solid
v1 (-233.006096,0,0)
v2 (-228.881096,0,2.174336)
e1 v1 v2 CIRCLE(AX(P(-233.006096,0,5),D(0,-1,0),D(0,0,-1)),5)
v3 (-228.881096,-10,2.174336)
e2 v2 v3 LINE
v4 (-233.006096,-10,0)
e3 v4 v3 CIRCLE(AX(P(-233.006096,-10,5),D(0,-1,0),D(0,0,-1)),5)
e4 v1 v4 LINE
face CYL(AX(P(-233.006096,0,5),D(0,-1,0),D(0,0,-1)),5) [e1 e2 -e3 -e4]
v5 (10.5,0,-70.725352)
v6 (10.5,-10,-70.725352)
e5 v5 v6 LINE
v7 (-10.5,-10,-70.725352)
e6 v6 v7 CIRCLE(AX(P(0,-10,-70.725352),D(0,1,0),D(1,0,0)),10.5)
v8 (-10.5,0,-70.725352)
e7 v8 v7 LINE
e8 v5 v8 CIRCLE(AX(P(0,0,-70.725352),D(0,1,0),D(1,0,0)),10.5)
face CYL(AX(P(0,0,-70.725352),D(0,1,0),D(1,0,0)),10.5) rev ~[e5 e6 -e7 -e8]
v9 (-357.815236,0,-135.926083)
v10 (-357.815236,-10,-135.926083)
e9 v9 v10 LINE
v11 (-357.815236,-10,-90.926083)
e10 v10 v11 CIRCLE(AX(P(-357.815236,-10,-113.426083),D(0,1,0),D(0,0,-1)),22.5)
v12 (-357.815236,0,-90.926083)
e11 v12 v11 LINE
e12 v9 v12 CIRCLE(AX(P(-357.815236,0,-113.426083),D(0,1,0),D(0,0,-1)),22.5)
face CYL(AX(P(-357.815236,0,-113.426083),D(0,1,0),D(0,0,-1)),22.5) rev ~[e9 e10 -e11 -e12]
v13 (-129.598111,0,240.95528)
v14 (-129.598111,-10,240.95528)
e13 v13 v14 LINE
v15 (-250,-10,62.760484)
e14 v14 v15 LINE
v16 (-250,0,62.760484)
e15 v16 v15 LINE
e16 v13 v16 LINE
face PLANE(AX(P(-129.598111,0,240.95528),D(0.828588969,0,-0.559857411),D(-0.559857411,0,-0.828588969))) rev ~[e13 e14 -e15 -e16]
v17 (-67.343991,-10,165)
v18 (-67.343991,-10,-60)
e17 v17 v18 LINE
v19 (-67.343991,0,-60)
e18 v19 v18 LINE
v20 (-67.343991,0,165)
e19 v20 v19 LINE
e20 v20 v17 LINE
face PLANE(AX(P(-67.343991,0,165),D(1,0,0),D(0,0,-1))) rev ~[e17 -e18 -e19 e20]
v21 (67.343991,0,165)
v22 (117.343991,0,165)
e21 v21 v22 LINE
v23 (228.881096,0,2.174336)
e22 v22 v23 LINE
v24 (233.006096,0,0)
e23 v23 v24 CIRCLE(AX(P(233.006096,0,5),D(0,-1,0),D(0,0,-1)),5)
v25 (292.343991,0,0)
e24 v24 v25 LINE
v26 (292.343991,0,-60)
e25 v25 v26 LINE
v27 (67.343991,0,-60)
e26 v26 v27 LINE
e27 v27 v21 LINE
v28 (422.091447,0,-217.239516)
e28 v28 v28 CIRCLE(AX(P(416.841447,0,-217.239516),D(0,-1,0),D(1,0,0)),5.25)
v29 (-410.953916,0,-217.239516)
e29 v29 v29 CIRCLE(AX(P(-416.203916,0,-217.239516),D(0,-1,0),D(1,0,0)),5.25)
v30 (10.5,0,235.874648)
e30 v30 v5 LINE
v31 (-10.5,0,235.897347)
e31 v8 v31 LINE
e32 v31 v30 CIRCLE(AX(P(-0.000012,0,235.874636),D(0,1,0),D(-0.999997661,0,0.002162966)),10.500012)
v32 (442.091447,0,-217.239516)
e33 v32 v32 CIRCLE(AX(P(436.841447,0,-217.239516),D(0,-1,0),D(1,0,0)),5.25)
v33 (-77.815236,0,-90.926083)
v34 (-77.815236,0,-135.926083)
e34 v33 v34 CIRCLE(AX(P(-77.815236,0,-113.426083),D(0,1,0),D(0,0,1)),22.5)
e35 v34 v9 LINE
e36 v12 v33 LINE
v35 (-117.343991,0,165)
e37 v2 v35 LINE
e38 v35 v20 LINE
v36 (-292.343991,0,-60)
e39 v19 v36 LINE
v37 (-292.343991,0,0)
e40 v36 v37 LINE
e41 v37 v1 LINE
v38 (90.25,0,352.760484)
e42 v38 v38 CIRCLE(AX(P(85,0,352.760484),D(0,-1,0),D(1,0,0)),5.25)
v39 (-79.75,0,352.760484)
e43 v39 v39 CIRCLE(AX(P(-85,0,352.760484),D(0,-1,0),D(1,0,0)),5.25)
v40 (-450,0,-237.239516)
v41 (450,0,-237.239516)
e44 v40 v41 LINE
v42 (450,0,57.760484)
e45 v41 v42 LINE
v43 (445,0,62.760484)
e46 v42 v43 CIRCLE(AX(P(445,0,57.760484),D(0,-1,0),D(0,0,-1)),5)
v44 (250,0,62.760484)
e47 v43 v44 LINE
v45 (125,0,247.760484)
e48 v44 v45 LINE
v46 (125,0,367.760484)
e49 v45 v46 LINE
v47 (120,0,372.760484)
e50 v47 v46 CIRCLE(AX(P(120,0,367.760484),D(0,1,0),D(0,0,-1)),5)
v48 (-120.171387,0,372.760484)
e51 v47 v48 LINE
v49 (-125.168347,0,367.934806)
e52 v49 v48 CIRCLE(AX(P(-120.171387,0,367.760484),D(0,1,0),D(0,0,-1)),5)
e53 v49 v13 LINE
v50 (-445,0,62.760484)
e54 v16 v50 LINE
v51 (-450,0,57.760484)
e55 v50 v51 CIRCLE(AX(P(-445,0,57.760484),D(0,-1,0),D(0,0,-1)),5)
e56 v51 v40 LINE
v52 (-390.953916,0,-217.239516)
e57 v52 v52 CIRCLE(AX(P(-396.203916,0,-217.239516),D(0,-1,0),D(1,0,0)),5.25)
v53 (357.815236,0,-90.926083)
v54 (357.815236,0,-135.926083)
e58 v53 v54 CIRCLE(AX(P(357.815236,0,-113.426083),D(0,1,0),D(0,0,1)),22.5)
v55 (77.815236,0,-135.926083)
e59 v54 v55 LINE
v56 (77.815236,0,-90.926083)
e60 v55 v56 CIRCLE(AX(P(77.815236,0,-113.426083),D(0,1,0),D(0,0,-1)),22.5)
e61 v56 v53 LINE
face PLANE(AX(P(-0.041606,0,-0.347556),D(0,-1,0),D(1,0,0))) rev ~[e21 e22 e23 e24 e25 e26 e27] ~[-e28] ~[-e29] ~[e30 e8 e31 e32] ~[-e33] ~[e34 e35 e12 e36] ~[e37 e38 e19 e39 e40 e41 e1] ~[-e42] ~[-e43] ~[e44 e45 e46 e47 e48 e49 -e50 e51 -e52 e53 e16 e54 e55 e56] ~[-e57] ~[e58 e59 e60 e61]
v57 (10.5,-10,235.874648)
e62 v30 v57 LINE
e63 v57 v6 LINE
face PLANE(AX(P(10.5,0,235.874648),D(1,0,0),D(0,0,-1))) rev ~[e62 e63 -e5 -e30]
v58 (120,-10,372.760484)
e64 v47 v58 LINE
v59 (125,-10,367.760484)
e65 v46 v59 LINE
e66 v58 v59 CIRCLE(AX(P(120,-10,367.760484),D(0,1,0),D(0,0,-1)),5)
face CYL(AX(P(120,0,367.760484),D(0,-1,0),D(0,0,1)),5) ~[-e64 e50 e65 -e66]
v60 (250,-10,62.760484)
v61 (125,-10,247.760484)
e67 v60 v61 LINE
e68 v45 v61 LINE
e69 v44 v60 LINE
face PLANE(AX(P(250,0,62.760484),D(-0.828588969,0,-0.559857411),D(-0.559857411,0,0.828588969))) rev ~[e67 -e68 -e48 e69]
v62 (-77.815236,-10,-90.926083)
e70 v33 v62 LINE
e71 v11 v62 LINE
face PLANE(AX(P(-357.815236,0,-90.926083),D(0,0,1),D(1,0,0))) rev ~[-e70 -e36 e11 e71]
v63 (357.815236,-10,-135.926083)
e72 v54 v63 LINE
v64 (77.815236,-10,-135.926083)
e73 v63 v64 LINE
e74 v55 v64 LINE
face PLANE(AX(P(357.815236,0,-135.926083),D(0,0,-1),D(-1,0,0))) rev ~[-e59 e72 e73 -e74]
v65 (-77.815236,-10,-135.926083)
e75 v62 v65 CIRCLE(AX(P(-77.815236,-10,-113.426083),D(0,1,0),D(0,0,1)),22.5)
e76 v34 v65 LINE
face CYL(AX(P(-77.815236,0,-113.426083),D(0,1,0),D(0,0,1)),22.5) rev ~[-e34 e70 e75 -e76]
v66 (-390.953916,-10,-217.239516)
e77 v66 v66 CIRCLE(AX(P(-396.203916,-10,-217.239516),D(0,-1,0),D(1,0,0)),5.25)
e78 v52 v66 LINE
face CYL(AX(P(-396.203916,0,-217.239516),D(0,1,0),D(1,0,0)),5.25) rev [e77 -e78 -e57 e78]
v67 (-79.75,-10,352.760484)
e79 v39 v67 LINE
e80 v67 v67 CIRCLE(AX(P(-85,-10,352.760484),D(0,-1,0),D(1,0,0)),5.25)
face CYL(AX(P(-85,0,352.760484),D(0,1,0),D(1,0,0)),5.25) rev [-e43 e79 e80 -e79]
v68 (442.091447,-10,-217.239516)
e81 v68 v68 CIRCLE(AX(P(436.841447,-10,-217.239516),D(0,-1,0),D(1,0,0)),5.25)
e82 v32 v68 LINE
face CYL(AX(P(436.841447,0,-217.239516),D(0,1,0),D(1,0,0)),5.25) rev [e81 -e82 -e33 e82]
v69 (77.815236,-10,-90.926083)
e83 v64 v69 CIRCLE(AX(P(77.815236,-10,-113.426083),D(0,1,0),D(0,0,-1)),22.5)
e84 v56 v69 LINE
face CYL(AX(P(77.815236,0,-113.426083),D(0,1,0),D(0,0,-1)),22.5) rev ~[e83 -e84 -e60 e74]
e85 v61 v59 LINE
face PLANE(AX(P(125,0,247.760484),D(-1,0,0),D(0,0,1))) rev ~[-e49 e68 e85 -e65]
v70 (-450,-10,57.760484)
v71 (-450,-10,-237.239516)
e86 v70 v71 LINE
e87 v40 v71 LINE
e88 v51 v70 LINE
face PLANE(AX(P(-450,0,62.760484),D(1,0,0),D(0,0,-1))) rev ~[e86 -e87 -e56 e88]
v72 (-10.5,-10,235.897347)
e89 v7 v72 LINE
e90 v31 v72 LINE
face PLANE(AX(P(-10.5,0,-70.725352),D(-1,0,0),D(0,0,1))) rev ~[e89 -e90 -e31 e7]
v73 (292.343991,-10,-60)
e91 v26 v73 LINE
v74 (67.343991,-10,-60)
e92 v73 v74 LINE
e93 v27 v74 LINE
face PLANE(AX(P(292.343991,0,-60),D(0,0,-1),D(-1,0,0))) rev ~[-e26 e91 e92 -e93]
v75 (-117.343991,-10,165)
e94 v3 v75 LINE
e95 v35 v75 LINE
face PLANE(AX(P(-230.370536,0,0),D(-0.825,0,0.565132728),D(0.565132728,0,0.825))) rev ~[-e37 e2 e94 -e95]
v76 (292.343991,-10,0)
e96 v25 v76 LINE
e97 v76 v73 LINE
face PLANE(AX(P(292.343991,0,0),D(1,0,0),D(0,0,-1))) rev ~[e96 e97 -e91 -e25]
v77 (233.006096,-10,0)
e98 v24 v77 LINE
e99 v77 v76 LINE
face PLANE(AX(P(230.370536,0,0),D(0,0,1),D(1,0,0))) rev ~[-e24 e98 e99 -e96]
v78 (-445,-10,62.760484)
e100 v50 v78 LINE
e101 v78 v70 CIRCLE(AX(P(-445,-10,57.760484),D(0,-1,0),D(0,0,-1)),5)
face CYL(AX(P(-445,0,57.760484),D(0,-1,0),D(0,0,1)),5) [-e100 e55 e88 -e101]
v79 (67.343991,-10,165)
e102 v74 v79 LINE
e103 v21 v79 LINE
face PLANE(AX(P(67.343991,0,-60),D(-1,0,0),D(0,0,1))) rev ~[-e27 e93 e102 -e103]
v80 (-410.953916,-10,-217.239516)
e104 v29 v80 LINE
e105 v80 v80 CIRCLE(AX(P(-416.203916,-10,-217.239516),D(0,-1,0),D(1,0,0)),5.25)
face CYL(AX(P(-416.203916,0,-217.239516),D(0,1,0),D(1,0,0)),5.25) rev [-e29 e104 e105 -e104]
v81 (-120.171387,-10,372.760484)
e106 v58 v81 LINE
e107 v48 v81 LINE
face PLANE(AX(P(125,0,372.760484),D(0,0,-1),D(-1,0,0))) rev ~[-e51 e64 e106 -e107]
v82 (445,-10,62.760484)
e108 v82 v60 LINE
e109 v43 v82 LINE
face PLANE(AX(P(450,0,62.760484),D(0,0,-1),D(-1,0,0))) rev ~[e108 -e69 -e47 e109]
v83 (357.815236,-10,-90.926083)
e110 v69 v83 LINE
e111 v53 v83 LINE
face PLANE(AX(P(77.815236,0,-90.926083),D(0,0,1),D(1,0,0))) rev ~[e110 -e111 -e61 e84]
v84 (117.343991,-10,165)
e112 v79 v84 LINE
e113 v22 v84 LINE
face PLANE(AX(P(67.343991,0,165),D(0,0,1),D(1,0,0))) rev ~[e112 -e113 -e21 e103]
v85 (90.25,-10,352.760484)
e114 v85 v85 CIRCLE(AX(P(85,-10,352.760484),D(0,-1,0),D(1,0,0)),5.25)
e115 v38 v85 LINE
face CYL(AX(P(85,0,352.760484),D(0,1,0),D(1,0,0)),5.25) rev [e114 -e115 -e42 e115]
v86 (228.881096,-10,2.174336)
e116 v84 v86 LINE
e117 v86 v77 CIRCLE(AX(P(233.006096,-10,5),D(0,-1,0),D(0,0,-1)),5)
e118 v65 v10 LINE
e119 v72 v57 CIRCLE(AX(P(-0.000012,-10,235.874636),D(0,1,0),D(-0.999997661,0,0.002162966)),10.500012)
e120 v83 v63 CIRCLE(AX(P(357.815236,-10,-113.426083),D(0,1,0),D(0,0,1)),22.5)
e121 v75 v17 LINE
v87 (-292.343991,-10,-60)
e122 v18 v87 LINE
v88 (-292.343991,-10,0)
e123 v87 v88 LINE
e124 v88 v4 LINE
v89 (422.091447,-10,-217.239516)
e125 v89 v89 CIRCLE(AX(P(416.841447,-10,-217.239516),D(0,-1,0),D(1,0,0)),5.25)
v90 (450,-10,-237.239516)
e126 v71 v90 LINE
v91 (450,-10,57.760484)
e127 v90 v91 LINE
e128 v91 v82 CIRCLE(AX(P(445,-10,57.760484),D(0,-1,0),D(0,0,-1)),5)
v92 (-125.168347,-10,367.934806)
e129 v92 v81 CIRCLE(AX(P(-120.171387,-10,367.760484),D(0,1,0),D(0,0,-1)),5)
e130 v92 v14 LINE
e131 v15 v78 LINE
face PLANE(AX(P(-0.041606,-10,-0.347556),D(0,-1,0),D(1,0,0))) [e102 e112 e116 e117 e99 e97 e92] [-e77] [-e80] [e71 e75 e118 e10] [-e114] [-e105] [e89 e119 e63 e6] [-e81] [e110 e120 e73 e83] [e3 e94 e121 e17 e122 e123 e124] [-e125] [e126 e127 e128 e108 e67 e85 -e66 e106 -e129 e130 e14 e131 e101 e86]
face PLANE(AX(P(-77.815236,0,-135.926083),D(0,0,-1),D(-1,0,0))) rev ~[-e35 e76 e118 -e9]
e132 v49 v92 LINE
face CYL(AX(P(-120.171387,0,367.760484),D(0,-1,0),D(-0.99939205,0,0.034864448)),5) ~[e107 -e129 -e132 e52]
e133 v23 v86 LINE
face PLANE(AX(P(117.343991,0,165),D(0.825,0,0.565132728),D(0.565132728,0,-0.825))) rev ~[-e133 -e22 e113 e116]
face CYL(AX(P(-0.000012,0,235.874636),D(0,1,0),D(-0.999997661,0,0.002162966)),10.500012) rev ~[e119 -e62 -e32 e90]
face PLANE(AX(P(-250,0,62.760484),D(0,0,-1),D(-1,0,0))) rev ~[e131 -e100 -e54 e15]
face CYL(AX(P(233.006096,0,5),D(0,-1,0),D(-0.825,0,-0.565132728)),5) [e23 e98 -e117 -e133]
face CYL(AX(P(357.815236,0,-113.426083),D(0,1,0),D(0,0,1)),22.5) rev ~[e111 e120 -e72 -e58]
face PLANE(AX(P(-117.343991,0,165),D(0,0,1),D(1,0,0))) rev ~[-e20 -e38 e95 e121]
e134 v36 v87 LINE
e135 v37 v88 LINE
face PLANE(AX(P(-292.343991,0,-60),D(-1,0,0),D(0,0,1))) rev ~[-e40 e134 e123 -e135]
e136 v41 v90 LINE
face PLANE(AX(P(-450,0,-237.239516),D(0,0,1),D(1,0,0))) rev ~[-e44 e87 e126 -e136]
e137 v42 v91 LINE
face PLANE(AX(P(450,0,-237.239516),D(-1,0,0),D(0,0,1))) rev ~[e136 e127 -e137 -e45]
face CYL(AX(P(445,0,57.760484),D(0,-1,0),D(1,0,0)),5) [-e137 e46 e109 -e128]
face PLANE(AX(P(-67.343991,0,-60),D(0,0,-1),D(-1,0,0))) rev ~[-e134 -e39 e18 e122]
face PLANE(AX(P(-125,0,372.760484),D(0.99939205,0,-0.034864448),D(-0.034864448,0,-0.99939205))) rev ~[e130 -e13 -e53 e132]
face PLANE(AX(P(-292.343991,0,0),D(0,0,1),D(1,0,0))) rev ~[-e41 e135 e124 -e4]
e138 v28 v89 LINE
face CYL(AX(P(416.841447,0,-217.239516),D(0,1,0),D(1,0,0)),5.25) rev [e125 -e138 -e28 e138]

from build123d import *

# Parameters (mm, degrees)
F0_R     = 5.25
F1_DEPTH = 10
F2_R     = 5
F3_R     = 5


# Not quite as in the source:
# - ends of sketch curves that miss each other by under 0.0002 mm in the source are joined


with BuildPart() as f1:
    # F0 (on Front) → F1 (new body)
    with BuildSketch(Plane.XZ):
        Polygon((-250, 62.7604842186), (-450, 62.7604842186), (-450, -237.2395157814), (0, -237.2395157814), (450, -237.2395157814), (450, 62.7604842186), (250, 62.7604842186), (125, 247.7604842186), (125, 372.7604842186), (-125, 372.7604842186), (-129.5981111256, 240.9552797528), align=None)
        with Locations((-416.2039160728, -217.2395157814)):
            Circle(F0_R, mode=Mode.SUBTRACT)
        with Locations((-396.2039160728, -217.2395157814)):
            Circle(F0_R, mode=Mode.SUBTRACT)
        with BuildLine():
            Line((-357.8152358532, -90.9260827303), (-77.8152358532, -90.9260827303))
            ThreePointArc((-77.8152358532, -90.9260827303), (-55.3152358532, -113.4260827303), (-77.8152358532, -135.9260827303))
            Line((-77.8152358532, -135.9260827303), (-357.8152358532, -135.9260827303))
            ThreePointArc((-357.8152358532, -135.9260827303), (-380.3152358532, -113.4260827303), (-357.8152358532, -90.9260827303))
        make_face(mode=Mode.SUBTRACT)
        Polygon((-292.343990892, -60), (-292.343990892, 0), (-230.3705364466, 0), (-117.343990892, 165), (-67.343990892, 165), (-67.343990892, 0), (-67.343990892, -60), align=None, mode=Mode.SUBTRACT)
        with BuildLine():
            ThreePointArc((77.8152358532, -135.9260827303), (55.3152358532, -113.4260827303), (77.8152358532, -90.9260827303))
            Line((77.8152358532, -90.9260827303), (357.8152358532, -90.9260827303))
            ThreePointArc((357.8152358532, -90.9260827303), (380.3152358532, -113.4260827303), (357.8152358532, -135.9260827303))
            Line((357.8152358532, -135.9260827303), (77.8152358532, -135.9260827303))
        make_face(mode=Mode.SUBTRACT)
        with Locations((416.8414473534, -217.2395157814)):
            Circle(F0_R, mode=Mode.SUBTRACT)
        with Locations((436.8414473534, -217.2395157814)):
            Circle(F0_R, mode=Mode.SUBTRACT)
        Polygon((67.343990892, 0), (67.343990892, 165), (117.343990892, 165), (230.3705364466, 0), (292.343990892, 0), (292.343990892, -60), (67.343990892, -60), align=None, mode=Mode.SUBTRACT)
        with Locations((-85, 352.7604842186)):
            Circle(F0_R, mode=Mode.SUBTRACT)
        with BuildLine():
            Line((-10.5, 235.874648428), (-10.5, 235.897347331))
            ThreePointArc((-10.5, 235.897347331), (0.0113494317, 246.3746422942), (10.5, 235.874648428))
            Line((10.5, 235.874648428), (10.5, 0.0226989031))
            Line((10.5, 0.0226989031), (10.5, -70.725351572))
            ThreePointArc((10.5, -70.725351572), (0, -81.225351572), (-10.5, -70.725351572))
            Line((-10.5, -70.725351572), (-10.5, 0))
            Line((-10.5, 0), (-10.5, 235.874648428))
        make_face(mode=Mode.SUBTRACT)
        with Locations((85, 352.7604842186)):
            Circle(F0_R, mode=Mode.SUBTRACT)
    extrude(amount=F1_DEPTH)

    # F2
    f2_edges = [f1.edges().sort_by_distance(p)[0] for p in [
        (-230.370536, -5, 0),
        (230.370536, -5, 0),
    ]]
    fillet(f2_edges, radius=F2_R)

    # F3
    f3_edges = [f1.edges().sort_by_distance(p)[0] for p in [
        (-450, -5, 62.760484),
        (-125, -5, 372.760484),
        (125, -5, 372.760484),
        (450, -5, 62.760484),
    ]]
    fillet(f3_edges, radius=F3_R)


solid = f1.part
